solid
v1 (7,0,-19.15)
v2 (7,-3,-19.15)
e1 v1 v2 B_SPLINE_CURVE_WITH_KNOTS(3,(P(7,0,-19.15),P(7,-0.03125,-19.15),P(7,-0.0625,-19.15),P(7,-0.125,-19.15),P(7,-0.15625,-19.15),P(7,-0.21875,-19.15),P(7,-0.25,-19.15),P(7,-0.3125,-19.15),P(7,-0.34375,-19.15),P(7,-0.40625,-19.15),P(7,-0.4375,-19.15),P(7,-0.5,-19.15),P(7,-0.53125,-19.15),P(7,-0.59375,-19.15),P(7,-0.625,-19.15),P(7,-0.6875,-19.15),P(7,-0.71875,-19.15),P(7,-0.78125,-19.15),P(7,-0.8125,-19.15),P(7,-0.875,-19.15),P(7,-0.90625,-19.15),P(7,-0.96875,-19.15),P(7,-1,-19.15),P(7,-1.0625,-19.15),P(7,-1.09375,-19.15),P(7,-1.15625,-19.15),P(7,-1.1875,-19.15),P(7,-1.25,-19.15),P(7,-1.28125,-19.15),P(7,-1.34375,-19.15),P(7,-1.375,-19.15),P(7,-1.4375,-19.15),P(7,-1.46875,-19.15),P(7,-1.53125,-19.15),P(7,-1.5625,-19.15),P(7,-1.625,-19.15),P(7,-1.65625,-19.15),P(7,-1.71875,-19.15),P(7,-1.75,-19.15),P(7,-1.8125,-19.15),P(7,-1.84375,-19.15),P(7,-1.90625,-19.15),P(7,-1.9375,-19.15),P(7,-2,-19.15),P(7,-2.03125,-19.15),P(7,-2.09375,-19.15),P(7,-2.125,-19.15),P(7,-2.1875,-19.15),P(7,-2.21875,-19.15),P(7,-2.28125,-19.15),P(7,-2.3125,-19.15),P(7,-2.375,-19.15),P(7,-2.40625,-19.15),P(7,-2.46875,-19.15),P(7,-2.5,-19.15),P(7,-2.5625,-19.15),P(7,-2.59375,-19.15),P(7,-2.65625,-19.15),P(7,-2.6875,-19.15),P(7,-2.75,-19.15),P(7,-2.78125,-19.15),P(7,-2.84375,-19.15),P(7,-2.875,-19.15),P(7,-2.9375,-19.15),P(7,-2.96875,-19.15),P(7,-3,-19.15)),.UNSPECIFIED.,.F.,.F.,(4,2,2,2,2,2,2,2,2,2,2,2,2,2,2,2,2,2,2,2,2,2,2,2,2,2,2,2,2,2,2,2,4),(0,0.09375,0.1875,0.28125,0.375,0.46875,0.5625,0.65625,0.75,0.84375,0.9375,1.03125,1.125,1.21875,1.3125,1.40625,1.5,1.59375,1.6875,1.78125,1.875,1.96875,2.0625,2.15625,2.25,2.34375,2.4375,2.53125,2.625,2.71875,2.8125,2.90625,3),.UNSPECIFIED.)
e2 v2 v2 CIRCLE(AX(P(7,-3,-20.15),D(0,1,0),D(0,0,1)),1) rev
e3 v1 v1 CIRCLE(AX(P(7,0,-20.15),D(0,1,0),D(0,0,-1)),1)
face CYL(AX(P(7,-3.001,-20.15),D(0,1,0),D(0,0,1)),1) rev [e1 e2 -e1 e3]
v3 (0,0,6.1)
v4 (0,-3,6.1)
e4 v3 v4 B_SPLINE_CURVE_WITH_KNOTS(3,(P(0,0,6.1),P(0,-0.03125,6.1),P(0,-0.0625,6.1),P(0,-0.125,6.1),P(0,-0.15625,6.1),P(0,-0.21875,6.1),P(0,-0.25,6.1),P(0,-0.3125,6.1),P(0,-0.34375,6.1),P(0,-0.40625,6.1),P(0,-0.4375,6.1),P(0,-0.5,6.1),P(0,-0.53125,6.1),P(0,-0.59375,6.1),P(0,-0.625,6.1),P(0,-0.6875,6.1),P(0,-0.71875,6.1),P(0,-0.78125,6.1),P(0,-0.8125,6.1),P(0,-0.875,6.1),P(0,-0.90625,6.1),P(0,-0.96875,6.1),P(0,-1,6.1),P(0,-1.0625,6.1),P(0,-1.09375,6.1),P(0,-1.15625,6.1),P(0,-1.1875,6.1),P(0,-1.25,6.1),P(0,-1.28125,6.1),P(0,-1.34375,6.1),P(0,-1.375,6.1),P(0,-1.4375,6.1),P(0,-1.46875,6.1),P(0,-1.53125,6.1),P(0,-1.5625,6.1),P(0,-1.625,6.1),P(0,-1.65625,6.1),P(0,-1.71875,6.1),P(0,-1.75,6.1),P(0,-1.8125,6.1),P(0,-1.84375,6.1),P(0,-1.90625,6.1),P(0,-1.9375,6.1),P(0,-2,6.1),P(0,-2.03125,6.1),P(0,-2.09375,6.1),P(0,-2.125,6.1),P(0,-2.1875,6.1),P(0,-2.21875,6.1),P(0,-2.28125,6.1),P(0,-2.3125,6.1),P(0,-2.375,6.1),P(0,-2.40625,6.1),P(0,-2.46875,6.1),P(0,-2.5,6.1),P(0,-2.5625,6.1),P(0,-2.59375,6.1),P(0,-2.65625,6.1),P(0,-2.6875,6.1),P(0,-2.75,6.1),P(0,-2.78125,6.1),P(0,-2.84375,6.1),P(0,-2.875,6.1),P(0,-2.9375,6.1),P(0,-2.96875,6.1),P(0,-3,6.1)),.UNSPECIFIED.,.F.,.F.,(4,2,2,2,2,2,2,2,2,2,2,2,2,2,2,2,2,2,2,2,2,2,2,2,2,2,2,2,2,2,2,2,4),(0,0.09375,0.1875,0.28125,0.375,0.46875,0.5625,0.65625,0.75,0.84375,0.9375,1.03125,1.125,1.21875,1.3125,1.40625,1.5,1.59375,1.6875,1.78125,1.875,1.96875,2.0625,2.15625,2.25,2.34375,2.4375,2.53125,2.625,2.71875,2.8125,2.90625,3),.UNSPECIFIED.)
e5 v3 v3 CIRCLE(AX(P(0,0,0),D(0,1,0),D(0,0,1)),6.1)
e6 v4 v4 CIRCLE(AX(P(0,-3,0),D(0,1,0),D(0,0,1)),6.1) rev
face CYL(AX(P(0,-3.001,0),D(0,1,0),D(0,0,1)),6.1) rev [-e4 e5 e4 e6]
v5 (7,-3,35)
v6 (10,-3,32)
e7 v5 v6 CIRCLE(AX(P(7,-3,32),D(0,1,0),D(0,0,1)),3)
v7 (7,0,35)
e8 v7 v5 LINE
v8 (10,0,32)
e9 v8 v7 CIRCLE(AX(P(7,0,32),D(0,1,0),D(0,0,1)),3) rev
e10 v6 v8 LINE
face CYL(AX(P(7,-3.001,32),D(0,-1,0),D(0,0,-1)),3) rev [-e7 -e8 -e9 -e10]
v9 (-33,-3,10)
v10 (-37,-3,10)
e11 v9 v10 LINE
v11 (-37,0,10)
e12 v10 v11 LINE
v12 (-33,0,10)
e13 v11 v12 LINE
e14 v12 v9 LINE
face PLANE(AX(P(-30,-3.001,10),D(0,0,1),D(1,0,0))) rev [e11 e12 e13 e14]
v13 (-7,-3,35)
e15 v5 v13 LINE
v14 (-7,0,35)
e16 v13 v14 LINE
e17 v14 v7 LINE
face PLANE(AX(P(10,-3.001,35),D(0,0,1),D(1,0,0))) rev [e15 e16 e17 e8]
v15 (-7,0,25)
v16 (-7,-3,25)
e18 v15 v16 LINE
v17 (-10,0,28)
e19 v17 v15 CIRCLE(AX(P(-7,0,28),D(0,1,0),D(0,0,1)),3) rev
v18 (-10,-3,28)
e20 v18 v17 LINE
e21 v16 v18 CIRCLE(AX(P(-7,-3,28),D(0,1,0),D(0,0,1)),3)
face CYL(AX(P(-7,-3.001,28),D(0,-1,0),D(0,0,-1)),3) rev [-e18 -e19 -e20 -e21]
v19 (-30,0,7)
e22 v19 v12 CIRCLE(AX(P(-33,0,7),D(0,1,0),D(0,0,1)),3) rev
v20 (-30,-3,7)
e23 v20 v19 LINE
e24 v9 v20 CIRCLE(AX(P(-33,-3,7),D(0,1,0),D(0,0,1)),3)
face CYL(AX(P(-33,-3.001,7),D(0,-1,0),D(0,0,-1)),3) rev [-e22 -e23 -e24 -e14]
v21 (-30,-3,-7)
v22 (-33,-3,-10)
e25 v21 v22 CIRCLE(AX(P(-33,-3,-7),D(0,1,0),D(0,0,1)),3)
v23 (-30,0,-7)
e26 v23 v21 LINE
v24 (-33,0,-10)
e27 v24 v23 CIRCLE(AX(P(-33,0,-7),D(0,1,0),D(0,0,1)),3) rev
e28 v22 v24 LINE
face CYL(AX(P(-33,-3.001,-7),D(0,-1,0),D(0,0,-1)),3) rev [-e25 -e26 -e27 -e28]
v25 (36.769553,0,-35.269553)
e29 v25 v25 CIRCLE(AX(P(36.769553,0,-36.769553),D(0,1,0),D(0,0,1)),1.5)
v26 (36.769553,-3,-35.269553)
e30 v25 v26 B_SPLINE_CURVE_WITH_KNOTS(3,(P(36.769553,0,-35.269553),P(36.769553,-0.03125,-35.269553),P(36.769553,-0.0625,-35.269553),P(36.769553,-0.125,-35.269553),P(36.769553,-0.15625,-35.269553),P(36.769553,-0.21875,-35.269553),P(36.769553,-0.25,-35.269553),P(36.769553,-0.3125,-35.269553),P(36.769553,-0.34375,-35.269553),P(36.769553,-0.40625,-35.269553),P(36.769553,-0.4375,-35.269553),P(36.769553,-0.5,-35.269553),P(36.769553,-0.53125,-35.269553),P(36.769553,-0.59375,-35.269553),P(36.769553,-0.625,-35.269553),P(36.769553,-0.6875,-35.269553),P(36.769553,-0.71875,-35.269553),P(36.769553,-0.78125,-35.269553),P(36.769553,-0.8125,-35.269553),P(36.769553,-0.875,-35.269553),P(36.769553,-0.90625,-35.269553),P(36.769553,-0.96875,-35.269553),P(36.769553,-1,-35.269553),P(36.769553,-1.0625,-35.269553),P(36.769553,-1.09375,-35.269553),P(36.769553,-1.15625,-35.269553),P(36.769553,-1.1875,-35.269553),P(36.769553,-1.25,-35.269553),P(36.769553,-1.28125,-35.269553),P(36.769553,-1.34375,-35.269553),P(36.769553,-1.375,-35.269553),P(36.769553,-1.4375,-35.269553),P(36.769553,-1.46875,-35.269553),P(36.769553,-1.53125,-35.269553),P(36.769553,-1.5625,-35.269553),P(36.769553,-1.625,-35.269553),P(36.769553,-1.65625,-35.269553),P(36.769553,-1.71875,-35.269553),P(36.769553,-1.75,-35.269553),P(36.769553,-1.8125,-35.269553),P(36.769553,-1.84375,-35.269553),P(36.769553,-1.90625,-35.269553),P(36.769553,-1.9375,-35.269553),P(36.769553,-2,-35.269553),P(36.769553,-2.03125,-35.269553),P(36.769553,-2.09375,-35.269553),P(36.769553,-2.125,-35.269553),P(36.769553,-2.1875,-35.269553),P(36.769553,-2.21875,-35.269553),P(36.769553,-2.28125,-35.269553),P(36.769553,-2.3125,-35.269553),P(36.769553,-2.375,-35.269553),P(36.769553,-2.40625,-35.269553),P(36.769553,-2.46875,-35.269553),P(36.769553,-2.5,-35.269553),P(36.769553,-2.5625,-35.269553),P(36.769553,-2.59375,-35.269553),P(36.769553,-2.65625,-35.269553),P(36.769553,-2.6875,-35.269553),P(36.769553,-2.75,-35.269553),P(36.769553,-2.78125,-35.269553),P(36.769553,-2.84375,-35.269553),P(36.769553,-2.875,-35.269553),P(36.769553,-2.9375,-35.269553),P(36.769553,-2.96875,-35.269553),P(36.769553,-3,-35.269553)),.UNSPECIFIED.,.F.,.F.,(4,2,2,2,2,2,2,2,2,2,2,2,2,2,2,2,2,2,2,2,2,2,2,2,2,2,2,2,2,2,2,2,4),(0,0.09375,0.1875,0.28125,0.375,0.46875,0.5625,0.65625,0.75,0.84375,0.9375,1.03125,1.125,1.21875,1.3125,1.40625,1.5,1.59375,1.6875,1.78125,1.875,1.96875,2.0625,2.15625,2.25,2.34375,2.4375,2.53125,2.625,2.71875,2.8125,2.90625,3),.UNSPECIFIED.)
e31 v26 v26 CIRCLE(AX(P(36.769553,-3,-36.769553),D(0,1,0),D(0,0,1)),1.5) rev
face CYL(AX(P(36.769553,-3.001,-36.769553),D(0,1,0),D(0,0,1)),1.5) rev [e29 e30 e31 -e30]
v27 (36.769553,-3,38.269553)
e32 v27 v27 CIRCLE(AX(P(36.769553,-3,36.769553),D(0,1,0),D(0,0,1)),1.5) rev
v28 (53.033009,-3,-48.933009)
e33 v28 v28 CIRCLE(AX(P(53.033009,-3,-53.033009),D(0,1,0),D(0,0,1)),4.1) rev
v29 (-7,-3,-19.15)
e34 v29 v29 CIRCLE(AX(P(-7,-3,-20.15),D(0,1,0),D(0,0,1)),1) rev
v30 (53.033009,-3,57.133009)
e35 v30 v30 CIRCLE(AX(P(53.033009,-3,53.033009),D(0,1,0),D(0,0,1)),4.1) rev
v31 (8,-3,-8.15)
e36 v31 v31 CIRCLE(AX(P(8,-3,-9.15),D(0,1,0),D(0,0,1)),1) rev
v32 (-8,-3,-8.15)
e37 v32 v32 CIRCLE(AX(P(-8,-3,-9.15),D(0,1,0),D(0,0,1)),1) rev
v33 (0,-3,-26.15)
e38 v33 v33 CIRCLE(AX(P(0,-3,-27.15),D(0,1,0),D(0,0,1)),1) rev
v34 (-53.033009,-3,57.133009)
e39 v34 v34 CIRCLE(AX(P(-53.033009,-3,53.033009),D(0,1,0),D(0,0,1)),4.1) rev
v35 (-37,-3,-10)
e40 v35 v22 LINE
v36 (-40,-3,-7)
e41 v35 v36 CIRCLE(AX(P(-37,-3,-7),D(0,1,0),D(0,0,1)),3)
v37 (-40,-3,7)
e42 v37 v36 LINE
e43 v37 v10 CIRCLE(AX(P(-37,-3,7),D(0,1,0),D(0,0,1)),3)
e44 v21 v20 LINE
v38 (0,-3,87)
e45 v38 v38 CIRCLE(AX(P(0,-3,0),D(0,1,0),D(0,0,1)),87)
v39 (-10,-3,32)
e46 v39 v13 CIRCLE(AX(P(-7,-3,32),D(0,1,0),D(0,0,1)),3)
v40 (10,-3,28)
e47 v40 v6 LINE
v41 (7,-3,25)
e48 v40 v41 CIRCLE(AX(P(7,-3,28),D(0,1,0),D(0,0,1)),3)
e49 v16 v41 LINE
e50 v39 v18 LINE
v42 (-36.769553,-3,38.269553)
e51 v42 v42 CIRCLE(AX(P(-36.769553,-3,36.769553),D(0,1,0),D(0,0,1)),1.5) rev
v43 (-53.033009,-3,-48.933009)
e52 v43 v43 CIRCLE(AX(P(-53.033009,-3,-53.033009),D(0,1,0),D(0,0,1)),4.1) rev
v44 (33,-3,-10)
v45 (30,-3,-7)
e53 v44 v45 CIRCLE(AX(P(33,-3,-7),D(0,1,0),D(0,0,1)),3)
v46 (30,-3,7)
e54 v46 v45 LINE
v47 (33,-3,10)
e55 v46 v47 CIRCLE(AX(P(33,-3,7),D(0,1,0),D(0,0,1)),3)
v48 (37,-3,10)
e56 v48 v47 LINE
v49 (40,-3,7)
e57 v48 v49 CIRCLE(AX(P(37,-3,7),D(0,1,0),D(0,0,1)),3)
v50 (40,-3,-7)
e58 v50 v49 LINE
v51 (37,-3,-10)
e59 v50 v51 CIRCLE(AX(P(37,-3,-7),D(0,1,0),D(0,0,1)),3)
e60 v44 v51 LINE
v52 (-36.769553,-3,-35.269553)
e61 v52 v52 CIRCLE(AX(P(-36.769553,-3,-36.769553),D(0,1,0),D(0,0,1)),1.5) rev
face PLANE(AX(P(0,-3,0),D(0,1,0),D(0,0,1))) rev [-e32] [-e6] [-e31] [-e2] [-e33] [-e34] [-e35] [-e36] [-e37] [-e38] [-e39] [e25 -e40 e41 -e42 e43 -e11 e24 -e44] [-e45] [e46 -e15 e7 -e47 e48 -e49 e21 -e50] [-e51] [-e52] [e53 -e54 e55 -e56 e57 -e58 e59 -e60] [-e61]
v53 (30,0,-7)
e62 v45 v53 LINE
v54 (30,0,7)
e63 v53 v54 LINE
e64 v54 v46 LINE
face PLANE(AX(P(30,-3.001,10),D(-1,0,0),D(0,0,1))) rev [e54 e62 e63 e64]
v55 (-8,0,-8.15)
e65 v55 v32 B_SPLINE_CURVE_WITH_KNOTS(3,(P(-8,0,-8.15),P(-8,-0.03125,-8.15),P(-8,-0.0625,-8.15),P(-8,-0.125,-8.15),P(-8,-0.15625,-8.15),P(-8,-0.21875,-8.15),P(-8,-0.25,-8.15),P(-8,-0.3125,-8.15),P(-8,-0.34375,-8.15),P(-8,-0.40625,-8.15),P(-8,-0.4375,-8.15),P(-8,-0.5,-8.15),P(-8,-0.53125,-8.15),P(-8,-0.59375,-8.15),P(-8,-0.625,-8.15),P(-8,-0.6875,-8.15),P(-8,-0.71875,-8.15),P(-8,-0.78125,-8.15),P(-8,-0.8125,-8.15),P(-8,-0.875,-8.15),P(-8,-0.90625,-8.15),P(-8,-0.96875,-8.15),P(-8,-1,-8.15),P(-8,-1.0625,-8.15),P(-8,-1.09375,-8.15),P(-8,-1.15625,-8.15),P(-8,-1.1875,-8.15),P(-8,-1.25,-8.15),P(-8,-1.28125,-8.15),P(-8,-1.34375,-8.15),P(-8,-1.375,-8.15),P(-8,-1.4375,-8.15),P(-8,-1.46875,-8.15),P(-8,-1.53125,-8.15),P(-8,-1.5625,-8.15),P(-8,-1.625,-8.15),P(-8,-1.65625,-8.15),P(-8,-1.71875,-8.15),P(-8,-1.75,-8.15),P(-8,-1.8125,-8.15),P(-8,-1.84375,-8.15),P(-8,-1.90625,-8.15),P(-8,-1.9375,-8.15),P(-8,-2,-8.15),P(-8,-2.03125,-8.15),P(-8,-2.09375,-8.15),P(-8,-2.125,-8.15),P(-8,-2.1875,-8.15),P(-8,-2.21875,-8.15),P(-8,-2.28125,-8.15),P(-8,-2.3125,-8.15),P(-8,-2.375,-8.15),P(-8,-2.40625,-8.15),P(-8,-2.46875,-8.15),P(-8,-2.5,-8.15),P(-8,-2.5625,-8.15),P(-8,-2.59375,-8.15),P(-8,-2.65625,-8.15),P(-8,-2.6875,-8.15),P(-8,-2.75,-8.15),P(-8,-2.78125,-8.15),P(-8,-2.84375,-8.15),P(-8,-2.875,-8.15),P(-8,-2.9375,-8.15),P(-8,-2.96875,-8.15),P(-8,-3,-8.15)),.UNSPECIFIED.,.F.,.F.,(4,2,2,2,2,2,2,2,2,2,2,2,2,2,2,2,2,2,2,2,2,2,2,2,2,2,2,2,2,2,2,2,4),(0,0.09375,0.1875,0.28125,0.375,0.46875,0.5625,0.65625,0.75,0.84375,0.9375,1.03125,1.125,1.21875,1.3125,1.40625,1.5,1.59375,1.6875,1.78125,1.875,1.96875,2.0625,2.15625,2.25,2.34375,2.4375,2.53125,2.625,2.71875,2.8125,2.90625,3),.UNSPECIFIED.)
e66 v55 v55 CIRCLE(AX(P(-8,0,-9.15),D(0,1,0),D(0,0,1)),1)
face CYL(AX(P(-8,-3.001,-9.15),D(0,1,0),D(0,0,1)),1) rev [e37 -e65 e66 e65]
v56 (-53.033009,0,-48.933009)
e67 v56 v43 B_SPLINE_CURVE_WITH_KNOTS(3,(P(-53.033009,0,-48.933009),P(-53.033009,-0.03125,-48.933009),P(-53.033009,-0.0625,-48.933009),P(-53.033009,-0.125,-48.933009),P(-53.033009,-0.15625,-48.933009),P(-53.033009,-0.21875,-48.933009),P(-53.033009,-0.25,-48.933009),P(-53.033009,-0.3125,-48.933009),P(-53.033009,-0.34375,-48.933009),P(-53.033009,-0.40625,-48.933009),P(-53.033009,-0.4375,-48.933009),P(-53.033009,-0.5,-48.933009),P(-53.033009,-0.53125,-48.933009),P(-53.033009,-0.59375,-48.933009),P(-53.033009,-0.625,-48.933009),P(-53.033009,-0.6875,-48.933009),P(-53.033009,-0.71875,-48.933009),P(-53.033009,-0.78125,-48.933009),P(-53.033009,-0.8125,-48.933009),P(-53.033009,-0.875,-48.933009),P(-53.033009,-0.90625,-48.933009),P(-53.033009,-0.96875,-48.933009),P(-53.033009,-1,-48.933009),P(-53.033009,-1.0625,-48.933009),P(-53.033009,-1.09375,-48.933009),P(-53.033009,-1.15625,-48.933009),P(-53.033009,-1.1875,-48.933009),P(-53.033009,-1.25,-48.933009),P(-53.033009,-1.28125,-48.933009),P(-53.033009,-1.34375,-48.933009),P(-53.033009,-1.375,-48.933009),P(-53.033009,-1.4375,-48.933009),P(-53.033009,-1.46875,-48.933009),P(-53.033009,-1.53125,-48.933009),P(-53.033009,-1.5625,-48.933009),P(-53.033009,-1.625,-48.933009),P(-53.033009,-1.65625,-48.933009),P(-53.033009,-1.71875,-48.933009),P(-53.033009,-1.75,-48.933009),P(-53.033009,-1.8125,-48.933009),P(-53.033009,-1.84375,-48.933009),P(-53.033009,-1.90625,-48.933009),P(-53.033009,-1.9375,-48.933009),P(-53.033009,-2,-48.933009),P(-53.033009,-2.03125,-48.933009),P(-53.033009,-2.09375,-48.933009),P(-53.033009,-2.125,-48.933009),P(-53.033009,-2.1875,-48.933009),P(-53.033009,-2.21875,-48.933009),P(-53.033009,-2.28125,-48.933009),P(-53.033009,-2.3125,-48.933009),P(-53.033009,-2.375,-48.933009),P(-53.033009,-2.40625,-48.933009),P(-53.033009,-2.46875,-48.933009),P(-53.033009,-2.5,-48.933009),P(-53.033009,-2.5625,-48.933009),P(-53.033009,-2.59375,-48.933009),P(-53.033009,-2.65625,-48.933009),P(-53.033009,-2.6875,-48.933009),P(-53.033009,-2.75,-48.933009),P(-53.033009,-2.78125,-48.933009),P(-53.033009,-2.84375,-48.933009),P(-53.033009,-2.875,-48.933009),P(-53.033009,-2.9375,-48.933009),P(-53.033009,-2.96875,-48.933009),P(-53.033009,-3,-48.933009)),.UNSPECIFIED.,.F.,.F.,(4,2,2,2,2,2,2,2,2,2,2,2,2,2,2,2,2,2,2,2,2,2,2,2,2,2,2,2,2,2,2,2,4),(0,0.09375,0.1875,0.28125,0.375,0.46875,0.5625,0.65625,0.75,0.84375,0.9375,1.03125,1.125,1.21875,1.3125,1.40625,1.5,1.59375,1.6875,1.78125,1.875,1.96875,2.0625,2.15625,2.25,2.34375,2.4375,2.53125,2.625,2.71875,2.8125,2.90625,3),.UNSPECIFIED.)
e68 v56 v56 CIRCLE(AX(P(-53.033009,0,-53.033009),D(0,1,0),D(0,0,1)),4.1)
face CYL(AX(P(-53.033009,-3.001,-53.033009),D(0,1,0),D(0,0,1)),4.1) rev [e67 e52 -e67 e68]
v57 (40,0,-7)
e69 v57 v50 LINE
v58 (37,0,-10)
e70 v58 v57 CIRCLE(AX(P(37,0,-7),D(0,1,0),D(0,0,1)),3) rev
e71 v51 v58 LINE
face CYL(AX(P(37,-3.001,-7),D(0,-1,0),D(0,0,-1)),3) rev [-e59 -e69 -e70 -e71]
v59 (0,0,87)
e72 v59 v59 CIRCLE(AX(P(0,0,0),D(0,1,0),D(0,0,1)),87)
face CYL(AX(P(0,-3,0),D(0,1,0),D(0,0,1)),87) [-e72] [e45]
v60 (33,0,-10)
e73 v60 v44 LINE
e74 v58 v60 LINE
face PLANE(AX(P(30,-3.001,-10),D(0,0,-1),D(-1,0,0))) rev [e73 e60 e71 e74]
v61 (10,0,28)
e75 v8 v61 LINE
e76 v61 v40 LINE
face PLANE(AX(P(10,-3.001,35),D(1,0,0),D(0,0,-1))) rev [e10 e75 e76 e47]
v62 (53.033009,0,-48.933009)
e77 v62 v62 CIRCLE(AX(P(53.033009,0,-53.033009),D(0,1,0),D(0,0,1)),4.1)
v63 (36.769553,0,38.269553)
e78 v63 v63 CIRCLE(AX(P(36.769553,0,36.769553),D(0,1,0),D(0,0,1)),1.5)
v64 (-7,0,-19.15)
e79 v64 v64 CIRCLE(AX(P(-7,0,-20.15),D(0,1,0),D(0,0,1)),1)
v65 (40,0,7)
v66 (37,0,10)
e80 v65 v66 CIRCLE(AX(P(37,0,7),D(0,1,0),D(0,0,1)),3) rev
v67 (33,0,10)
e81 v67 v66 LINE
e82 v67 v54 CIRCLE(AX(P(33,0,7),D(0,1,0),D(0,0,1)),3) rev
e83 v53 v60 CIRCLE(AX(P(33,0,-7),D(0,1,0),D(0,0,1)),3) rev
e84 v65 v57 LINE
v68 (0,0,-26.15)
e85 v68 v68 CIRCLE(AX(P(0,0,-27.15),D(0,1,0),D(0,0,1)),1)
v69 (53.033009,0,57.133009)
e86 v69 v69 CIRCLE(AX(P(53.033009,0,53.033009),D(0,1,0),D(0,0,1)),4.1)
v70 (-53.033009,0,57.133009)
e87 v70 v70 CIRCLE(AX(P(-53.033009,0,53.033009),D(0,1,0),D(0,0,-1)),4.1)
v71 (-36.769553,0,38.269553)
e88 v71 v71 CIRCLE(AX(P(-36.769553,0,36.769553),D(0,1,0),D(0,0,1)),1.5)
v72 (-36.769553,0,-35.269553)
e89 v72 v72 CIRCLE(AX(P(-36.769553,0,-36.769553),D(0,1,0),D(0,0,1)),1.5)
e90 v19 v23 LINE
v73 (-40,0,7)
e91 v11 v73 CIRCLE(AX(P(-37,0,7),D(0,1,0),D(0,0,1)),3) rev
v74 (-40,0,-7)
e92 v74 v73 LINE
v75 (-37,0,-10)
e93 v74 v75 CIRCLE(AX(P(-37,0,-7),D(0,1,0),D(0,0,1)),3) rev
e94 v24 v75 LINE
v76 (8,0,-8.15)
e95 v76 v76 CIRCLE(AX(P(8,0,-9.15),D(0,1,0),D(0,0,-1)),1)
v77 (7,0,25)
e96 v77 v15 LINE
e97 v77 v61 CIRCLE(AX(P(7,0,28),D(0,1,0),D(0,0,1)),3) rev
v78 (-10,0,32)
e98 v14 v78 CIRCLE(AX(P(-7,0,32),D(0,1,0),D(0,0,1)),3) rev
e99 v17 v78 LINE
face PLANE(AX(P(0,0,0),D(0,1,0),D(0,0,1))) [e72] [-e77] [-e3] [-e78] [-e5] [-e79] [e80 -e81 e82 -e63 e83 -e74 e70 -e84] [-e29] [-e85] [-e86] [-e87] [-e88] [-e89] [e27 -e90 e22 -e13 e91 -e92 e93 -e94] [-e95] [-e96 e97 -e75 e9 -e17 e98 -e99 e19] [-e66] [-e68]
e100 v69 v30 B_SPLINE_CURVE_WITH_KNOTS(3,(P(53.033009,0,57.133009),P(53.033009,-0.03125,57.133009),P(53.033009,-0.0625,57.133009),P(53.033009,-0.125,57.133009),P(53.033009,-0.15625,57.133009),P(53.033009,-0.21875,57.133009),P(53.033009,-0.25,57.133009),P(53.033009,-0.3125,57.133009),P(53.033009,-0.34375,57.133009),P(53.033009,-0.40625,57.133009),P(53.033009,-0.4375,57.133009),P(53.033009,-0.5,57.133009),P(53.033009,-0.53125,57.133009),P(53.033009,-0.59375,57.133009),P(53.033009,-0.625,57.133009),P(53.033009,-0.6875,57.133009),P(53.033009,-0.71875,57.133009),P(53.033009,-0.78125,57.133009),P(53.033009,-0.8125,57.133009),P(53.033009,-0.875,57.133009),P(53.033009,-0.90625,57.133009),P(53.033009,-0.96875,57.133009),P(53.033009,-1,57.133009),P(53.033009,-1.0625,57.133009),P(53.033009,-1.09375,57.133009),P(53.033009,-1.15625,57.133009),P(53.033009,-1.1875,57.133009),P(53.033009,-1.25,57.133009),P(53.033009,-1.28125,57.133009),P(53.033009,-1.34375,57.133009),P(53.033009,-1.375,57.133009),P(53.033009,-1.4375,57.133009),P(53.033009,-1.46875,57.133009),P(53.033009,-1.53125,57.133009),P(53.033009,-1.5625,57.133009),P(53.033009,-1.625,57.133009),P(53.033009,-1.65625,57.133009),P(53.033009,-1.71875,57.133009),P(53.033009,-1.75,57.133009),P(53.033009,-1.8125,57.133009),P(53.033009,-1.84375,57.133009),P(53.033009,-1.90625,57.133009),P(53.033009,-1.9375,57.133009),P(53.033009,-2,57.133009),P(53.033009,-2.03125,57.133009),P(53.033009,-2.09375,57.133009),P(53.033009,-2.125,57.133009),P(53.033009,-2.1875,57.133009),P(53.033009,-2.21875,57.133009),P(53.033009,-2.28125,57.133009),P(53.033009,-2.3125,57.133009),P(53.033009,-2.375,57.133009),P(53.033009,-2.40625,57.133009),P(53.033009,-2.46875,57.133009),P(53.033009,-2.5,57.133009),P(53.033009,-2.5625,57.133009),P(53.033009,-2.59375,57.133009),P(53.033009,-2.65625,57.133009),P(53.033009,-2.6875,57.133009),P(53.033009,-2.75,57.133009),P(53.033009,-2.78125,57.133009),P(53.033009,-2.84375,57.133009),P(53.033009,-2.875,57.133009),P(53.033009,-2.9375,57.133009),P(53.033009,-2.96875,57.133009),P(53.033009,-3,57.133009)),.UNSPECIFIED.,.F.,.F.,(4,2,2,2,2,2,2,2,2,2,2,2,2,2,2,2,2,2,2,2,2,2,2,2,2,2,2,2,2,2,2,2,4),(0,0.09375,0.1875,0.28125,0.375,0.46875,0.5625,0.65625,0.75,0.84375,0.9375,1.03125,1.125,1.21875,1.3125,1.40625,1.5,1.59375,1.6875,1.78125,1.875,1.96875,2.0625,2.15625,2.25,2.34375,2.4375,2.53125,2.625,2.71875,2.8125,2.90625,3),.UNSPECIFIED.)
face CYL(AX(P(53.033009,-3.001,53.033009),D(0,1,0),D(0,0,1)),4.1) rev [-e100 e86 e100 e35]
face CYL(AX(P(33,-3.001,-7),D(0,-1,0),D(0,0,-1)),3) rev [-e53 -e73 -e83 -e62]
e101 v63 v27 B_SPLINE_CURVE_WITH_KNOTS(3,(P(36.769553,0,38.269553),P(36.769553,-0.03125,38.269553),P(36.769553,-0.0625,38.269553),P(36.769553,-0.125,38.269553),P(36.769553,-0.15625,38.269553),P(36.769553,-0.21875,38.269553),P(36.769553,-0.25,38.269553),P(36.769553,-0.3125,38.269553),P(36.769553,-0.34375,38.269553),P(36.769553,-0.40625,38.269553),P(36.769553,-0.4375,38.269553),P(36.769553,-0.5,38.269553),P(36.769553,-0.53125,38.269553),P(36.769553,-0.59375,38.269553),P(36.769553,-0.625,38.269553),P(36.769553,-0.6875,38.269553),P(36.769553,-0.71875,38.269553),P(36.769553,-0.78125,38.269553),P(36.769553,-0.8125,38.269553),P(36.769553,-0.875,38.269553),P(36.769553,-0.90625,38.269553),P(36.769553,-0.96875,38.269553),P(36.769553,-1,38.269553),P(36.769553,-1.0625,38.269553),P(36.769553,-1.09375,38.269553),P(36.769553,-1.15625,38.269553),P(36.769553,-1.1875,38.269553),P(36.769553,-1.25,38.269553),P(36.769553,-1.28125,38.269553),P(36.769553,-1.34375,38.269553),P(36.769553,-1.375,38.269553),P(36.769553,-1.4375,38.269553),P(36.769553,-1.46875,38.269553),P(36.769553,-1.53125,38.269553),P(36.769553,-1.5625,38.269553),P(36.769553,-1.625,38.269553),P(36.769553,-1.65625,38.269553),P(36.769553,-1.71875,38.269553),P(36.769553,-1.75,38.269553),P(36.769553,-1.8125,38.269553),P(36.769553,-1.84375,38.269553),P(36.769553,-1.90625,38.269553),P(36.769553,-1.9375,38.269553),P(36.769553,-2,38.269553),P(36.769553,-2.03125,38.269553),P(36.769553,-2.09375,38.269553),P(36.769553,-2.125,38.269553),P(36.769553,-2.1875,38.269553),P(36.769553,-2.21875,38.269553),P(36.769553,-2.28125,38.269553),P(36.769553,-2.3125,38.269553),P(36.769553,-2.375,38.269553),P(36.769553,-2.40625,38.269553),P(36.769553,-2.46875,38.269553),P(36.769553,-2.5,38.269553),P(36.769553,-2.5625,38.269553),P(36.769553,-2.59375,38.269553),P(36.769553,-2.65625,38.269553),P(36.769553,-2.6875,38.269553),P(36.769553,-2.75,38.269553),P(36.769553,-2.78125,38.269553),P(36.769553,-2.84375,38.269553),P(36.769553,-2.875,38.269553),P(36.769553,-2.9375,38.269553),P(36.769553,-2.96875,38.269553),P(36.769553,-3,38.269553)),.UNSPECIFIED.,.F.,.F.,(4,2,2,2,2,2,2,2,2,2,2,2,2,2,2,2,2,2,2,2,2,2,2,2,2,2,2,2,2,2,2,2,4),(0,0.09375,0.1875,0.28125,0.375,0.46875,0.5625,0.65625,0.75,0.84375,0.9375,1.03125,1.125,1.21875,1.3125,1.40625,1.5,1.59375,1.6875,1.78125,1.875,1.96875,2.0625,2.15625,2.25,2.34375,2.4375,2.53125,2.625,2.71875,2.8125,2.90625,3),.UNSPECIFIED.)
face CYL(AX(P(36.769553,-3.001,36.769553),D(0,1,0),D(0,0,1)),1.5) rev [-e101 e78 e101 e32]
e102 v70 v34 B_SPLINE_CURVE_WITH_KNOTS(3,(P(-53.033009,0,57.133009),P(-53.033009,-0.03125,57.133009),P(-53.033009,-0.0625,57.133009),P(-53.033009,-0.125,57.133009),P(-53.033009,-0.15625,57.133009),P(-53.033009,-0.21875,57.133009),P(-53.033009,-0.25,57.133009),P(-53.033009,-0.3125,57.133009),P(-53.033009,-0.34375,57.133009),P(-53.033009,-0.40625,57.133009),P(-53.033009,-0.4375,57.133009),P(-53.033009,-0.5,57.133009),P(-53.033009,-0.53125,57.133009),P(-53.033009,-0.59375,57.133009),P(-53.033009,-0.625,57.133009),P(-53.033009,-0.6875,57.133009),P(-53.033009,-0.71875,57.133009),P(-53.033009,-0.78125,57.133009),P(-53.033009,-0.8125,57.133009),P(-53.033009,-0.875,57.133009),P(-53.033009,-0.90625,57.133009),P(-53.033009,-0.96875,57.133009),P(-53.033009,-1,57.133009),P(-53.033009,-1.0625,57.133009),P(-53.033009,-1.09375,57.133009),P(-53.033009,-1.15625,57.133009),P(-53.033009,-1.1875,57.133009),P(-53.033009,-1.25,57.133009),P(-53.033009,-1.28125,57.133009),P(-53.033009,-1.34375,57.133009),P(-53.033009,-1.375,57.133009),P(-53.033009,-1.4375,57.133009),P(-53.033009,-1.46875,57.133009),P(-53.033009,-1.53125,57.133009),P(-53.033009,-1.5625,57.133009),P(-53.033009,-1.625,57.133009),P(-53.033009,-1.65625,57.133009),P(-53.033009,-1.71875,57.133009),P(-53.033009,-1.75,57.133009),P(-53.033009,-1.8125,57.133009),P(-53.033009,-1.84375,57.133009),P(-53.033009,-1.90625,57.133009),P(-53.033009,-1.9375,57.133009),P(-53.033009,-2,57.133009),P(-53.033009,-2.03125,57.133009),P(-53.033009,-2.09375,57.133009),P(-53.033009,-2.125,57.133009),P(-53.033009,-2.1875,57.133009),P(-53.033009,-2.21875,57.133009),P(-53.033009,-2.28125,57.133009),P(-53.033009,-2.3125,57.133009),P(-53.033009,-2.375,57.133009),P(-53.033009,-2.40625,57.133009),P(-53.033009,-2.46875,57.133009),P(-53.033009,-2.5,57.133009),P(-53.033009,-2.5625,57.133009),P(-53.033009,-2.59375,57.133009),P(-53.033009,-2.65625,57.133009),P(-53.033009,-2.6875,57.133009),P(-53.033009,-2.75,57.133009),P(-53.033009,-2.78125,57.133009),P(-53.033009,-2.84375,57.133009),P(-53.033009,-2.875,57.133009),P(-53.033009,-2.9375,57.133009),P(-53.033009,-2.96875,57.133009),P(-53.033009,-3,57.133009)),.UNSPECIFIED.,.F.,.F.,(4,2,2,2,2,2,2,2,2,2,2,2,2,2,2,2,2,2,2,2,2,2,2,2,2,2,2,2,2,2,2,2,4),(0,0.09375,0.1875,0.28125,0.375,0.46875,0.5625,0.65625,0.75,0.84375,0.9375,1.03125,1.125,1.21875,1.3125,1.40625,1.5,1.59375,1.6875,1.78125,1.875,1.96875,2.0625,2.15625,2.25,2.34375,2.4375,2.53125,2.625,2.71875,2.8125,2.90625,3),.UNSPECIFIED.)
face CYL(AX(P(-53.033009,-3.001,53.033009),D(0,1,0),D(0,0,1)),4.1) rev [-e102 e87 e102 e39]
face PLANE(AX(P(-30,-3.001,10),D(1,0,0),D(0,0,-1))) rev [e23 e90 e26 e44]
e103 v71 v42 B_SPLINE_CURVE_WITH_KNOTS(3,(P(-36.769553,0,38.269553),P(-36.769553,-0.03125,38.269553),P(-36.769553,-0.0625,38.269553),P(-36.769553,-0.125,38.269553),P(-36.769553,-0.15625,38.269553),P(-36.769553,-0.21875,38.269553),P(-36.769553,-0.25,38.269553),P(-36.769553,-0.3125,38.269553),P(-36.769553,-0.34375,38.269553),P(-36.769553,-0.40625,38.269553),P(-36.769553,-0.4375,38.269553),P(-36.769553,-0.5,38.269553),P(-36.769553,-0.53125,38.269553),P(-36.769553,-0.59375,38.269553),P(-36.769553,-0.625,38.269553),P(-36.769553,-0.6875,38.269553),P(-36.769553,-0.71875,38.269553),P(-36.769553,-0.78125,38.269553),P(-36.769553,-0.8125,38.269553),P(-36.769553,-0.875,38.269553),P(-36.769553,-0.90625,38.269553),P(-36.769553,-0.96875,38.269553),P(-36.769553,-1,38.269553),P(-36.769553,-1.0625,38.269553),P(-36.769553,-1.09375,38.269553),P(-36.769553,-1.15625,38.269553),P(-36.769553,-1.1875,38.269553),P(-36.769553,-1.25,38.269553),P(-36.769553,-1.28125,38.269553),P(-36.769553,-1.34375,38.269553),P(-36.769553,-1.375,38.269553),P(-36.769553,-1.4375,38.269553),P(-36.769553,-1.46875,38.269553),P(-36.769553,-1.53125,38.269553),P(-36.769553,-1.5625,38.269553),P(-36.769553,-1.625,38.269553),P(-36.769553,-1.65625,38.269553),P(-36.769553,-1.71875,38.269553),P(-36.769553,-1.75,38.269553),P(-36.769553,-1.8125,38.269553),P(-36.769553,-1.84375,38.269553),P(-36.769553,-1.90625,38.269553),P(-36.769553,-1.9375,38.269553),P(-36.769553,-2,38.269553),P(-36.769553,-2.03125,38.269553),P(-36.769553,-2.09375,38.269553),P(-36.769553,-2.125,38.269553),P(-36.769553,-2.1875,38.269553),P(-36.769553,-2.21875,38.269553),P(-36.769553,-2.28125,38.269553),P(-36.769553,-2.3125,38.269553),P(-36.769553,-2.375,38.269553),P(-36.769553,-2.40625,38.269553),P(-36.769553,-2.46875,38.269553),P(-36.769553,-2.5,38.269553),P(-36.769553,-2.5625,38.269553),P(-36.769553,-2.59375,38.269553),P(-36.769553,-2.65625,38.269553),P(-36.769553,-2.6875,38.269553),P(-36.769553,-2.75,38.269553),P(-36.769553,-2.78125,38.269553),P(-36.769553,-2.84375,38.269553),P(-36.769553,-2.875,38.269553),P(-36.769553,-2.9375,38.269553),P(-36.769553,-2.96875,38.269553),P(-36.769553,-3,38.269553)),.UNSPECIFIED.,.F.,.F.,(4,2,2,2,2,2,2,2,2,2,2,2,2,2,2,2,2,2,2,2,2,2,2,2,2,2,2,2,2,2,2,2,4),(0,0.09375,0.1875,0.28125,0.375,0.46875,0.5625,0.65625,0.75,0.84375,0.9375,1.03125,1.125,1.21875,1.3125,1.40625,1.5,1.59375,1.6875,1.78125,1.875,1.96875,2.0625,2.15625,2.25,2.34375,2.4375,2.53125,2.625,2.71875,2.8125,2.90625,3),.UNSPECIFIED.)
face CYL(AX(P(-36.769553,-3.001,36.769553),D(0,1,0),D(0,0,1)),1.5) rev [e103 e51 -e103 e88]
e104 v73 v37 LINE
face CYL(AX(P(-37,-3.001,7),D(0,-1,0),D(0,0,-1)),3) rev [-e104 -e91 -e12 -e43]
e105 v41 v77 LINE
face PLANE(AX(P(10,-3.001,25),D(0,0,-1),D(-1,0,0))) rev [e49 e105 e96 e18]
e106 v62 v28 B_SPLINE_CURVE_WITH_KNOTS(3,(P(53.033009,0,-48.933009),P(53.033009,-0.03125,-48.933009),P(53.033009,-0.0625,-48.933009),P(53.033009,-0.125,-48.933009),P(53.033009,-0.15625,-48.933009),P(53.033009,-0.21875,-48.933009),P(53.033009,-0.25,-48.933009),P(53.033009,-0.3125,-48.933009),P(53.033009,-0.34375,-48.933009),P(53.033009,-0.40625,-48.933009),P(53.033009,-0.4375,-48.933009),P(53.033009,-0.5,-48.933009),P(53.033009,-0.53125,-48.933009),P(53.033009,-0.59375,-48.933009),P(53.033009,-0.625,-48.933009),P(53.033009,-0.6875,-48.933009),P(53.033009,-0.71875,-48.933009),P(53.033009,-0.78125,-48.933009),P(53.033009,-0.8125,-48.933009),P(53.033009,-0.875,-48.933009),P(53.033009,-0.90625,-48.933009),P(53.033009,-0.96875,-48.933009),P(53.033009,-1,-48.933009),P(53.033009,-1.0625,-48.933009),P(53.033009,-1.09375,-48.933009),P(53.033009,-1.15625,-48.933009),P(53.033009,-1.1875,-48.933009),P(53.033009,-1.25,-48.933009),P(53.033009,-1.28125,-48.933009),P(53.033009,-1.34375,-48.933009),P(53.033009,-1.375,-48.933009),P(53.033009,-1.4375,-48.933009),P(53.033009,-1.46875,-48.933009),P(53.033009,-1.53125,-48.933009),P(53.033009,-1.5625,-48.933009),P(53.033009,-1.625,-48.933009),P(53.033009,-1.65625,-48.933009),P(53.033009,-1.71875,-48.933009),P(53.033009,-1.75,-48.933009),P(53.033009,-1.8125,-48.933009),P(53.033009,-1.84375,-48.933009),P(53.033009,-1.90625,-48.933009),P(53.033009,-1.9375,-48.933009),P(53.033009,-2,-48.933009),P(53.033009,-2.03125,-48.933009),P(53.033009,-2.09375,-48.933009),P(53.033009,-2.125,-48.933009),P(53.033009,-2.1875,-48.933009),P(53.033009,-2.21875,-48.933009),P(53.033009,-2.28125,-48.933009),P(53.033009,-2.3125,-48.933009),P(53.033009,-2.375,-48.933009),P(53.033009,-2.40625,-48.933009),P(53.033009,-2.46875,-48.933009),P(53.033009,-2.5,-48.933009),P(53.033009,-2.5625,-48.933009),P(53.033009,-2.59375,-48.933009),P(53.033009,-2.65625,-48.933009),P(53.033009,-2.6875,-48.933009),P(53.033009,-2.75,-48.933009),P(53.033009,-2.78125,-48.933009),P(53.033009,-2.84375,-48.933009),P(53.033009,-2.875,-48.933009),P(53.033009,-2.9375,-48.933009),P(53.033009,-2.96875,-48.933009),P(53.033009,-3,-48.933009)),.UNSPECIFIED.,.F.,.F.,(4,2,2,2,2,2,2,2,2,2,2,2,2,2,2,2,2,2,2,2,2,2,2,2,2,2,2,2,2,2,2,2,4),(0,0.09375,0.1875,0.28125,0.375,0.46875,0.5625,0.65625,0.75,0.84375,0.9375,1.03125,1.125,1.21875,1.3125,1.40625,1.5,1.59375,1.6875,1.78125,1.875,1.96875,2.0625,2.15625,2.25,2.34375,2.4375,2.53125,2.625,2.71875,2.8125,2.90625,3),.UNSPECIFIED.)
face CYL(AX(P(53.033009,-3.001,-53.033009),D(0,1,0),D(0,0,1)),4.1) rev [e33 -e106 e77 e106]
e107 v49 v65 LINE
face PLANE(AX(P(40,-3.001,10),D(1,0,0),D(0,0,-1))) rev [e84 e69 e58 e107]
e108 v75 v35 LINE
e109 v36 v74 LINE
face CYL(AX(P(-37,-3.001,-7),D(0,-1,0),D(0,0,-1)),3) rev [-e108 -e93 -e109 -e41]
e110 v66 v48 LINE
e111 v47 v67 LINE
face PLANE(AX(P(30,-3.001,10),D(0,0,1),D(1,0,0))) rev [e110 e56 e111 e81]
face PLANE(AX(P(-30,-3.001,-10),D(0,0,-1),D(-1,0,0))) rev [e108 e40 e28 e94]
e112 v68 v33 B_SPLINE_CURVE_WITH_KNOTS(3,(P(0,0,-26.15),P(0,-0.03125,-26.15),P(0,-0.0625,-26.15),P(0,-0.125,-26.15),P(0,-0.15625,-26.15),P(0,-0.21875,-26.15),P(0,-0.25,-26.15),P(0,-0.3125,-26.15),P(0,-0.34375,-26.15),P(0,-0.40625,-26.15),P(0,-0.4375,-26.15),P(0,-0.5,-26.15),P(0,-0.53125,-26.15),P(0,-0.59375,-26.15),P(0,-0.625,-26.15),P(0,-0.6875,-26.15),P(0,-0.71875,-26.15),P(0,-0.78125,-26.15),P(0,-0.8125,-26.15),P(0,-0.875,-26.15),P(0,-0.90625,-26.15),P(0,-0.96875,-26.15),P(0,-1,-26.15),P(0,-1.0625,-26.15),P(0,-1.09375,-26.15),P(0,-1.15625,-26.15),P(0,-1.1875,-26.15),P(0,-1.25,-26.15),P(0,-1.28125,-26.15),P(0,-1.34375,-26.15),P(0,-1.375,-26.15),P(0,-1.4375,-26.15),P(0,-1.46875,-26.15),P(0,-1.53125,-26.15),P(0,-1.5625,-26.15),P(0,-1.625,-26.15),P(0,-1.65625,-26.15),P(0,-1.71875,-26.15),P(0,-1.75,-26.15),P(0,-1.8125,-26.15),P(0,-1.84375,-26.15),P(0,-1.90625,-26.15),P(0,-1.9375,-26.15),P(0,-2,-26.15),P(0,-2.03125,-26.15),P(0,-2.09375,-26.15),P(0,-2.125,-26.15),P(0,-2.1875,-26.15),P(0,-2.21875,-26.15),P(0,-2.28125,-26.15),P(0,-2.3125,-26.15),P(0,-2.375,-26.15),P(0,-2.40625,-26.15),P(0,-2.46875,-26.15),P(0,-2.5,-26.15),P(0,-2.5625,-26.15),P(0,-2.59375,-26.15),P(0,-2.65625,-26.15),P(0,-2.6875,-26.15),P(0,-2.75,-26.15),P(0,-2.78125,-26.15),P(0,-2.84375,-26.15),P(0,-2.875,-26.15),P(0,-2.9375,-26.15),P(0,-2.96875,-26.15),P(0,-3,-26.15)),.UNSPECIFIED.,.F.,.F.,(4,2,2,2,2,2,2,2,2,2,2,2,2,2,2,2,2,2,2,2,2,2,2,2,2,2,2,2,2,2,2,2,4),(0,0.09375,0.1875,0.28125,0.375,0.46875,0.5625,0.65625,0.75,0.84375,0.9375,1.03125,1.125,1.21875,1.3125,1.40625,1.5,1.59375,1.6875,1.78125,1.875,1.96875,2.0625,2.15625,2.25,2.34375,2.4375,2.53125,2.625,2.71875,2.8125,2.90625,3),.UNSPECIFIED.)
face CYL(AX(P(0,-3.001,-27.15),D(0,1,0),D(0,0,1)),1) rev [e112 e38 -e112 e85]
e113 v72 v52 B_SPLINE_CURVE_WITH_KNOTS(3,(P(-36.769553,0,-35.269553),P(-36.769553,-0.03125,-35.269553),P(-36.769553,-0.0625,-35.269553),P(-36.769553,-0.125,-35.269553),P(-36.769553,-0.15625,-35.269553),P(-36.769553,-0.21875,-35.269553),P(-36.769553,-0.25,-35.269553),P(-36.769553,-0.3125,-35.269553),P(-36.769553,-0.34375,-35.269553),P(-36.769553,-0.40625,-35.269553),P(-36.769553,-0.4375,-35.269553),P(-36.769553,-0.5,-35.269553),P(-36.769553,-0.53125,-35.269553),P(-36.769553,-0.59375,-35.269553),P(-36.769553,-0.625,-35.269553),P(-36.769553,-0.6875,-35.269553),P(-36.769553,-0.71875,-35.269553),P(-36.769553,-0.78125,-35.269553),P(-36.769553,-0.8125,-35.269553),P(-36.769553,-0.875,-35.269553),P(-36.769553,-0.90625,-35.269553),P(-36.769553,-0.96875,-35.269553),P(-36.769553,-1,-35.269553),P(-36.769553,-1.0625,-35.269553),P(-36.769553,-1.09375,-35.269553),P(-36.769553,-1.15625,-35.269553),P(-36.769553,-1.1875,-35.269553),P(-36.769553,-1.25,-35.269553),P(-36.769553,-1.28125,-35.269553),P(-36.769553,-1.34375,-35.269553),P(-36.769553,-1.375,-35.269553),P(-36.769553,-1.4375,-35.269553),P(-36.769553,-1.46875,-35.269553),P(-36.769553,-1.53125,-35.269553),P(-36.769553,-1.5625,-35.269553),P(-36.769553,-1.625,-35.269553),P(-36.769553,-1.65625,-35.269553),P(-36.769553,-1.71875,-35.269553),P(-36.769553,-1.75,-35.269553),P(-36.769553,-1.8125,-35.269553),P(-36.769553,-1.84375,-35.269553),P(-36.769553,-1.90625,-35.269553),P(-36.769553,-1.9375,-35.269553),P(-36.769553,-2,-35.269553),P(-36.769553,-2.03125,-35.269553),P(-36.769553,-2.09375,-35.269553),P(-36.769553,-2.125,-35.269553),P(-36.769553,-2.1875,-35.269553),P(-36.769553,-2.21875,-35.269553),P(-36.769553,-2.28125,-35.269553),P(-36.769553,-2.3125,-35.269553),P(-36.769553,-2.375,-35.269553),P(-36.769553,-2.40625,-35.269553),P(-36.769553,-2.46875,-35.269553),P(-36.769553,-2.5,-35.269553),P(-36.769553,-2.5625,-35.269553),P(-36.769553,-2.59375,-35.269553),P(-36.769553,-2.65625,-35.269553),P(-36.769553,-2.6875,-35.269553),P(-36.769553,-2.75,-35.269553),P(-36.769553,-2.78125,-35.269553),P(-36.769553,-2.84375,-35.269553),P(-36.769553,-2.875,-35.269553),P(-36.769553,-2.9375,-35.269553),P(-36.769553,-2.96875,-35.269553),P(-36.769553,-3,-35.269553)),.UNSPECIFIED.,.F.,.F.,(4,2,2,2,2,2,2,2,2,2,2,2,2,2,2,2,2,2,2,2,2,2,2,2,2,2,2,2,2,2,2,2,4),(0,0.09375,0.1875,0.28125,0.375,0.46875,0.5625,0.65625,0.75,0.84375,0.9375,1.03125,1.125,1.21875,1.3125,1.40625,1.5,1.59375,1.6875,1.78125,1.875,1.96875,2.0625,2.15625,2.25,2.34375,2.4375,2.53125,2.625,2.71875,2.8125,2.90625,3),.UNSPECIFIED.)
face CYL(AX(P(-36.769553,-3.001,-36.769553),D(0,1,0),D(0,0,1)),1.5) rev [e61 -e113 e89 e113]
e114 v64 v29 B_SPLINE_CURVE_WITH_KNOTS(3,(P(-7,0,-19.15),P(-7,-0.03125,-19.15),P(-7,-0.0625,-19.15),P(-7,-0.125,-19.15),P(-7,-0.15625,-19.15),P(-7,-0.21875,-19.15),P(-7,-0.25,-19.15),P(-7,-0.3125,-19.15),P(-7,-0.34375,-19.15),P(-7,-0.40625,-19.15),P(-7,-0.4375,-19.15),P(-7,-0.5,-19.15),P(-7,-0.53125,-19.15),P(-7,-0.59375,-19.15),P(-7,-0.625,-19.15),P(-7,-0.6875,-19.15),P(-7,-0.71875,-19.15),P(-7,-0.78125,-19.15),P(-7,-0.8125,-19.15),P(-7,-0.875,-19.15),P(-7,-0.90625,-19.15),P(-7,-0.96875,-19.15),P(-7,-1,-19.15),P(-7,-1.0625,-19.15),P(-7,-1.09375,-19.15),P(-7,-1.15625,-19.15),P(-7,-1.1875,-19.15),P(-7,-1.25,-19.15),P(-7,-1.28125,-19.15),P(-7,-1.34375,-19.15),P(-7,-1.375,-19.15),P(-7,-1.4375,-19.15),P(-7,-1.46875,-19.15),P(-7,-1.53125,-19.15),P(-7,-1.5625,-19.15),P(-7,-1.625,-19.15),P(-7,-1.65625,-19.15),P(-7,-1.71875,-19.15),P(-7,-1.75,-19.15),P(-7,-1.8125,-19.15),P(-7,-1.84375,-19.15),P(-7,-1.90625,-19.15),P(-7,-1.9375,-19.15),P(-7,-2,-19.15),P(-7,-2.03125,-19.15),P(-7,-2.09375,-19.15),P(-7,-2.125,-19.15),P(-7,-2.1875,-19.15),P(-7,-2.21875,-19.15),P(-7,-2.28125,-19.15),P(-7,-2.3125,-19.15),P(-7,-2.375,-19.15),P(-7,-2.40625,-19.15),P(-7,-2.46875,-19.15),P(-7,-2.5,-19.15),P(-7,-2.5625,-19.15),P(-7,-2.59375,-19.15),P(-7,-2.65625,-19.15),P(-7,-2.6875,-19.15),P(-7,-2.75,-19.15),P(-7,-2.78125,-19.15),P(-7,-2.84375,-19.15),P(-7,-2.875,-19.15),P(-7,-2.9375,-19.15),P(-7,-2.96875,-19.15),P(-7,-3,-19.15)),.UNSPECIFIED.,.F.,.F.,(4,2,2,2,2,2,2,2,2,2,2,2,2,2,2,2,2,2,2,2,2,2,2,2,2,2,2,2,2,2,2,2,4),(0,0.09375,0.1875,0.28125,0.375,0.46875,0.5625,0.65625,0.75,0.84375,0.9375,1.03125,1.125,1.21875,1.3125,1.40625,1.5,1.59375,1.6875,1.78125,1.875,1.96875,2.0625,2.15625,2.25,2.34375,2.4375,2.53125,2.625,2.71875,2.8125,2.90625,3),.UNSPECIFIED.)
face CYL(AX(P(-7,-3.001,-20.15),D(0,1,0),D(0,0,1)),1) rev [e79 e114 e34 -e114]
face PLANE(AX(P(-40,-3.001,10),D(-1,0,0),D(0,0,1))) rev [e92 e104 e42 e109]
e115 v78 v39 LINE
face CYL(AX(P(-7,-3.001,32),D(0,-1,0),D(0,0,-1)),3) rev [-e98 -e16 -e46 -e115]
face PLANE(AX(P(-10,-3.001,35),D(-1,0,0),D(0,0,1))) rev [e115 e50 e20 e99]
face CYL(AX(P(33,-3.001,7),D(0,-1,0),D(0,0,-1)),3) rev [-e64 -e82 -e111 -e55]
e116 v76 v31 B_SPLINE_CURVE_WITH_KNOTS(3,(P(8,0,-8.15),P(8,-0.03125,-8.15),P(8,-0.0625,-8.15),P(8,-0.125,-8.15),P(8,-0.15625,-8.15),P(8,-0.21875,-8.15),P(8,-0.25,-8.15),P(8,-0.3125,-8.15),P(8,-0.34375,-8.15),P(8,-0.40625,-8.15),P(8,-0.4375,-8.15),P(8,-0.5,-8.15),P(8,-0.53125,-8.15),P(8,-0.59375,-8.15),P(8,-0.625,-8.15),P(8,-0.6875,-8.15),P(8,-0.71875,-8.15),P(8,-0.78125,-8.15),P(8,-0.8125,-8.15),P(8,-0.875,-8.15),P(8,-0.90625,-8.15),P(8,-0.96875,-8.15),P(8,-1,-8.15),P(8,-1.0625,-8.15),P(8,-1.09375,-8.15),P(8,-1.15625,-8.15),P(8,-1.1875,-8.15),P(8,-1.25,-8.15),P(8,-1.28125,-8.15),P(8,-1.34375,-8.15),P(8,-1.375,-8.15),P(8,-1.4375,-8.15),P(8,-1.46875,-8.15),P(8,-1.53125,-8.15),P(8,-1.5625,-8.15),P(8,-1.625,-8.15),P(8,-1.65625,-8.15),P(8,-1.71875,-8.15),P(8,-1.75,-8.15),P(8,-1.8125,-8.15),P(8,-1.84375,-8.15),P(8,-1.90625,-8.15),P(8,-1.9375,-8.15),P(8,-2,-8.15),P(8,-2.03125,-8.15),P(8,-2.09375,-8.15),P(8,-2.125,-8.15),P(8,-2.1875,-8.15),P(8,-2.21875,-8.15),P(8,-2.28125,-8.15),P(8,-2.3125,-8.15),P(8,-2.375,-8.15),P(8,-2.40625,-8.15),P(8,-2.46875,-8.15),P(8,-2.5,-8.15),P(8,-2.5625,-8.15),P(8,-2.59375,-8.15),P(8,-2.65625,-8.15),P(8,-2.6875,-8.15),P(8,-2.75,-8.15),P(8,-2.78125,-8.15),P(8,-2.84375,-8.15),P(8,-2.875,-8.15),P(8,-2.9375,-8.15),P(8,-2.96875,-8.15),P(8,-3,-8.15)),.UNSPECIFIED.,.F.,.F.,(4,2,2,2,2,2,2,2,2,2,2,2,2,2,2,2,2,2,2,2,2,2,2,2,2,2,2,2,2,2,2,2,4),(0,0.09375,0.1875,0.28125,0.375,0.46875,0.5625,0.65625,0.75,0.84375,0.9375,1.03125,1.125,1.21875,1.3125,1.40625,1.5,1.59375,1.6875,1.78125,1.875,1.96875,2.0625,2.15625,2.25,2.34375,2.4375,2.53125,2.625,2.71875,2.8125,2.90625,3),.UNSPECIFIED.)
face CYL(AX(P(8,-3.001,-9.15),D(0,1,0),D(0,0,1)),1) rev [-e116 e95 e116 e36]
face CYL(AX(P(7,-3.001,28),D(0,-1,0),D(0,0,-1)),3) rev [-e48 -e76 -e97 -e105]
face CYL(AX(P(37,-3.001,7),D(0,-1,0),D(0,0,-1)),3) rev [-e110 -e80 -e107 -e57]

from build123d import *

# Parameters (mm, degrees)
SKETCH_1_R             = 87
SM_BASE_FLANGE_1_DEPTH = 3
CUT_EXTRUDE_1_REACH    = 125.073
SKETCH_6_R             = 6.1
SKETCH_6_R_2           = 1
SKETCH_6_R_3           = 4.1
SKETCH_6_R_4           = 1.5
SKETCH_6_W             = 10
SKETCH_6_H             = 20
SKETCH_6_W_2           = 20
SKETCH_6_H_2           = 10
FILLET_1_R             = 3


# Sheet-metal steps are written as plain solids
with BuildPart() as part:
    # Sketch 1 → 基体-法兰1 (new body)
    with BuildSketch(Plane(origin=(0, 0, 0), x_dir=(1, 0, 0), z_dir=(0, 1, 0))):
        with Locations(Location((0, 0, 0), (0, 0, 270))):
            Circle(SKETCH_1_R)
    extrude(amount=-SM_BASE_FLANGE_1_DEPTH)

    # 草图6 → 切除-拉伸1 (cut, up to next)
    with BuildSketch(Plane(origin=(0, 0, 0), x_dir=(1, 0, 0), z_dir=(0, 1, 0)), mode=Mode.PRIVATE) as cut_extrude_1_sk1:
        with Locations(Location((0, 0, 0), (0, 0, 270))):
            Circle(SKETCH_6_R)
    cut_extrude_1_tool1 = extrude(cut_extrude_1_sk1.sketch, amount=-CUT_EXTRUDE_1_REACH, mode=Mode.PRIVATE) & part.part
    # 草图6 → 切除-拉伸1 (cut, up to next)
    with BuildSketch(Plane(origin=(0, 0, 0), x_dir=(1, 0, 0), z_dir=(0, 1, 0)), mode=Mode.PRIVATE) as cut_extrude_1_sk2:
        with Locations(Location((-8, 9.15, 0), (0, 0, 270))):
            Circle(SKETCH_6_R_2)
    cut_extrude_1_tool2 = extrude(cut_extrude_1_sk2.sketch, amount=-CUT_EXTRUDE_1_REACH, mode=Mode.PRIVATE) & part.part
    # 草图6 → 切除-拉伸1 (cut, up to next)
    with BuildSketch(Plane(origin=(0, 0, 0), x_dir=(1, 0, 0), z_dir=(0, 1, 0)), mode=Mode.PRIVATE) as cut_extrude_1_sk3:
        with Locations(Location((-7, 20.15, 0), (0, 0, 270))):
            Circle(SKETCH_6_R_2)
    cut_extrude_1_tool3 = extrude(cut_extrude_1_sk3.sketch, amount=-CUT_EXTRUDE_1_REACH, mode=Mode.PRIVATE) & part.part
    # 草图6 → 切除-拉伸1 (cut, up to next)
    with BuildSketch(Plane(origin=(0, 0, 0), x_dir=(1, 0, 0), z_dir=(0, 1, 0)), mode=Mode.PRIVATE) as cut_extrude_1_sk4:
        with Locations(Location((53.033008589, 53.033008589, 0), (0, 0, 270))):
            Circle(SKETCH_6_R_3)
    cut_extrude_1_tool4 = extrude(cut_extrude_1_sk4.sketch, amount=-CUT_EXTRUDE_1_REACH, mode=Mode.PRIVATE) & part.part
    # 草图6 → 切除-拉伸1 (cut, up to next)
    with BuildSketch(Plane(origin=(0, 0, 0), x_dir=(1, 0, 0), z_dir=(0, 1, 0)), mode=Mode.PRIVATE) as cut_extrude_1_sk5:
        with Locations(Location((-53.033008589, 53.033008589, 0), (0, 0, 270))):
            Circle(SKETCH_6_R_3)
    cut_extrude_1_tool5 = extrude(cut_extrude_1_sk5.sketch, amount=-CUT_EXTRUDE_1_REACH, mode=Mode.PRIVATE) & part.part
    # 草图6 → 切除-拉伸1 (cut, up to next)
    with BuildSketch(Plane(origin=(0, 0, 0), x_dir=(1, 0, 0), z_dir=(0, 1, 0)), mode=Mode.PRIVATE) as cut_extrude_1_sk6:
        with Locations(Location((53.033008589, -53.033008589, 0), (0, 0, 270))):
            Circle(SKETCH_6_R_3)
    cut_extrude_1_tool6 = extrude(cut_extrude_1_sk6.sketch, amount=-CUT_EXTRUDE_1_REACH, mode=Mode.PRIVATE) & part.part
    # 草图6 → 切除-拉伸1 (cut, up to next)
    with BuildSketch(Plane(origin=(0, 0, 0), x_dir=(1, 0, 0), z_dir=(0, 1, 0)), mode=Mode.PRIVATE) as cut_extrude_1_sk7:
        with Locations(Location((-53.033008589, -53.033008589, 0), (0, 0, 270))):
            Circle(SKETCH_6_R_3)
    cut_extrude_1_tool7 = extrude(cut_extrude_1_sk7.sketch, amount=-CUT_EXTRUDE_1_REACH, mode=Mode.PRIVATE) & part.part
    # 草图6 → 切除-拉伸1 (cut, up to next)
    with BuildSketch(Plane(origin=(0, 0, 0), x_dir=(1, 0, 0), z_dir=(0, 1, 0)), mode=Mode.PRIVATE) as cut_extrude_1_sk8:
        with Locations(Location((8, 9.15, 0), (0, 0, 270))):
            Circle(SKETCH_6_R_2)
    cut_extrude_1_tool8 = extrude(cut_extrude_1_sk8.sketch, amount=-CUT_EXTRUDE_1_REACH, mode=Mode.PRIVATE) & part.part
    # 草图6 → 切除-拉伸1 (cut, up to next)
    with BuildSketch(Plane(origin=(0, 0, 0), x_dir=(1, 0, 0), z_dir=(0, 1, 0)), mode=Mode.PRIVATE) as cut_extrude_1_sk9:
        with Locations(Location((7, 20.15, 0), (0, 0, 270))):
            Circle(SKETCH_6_R_2)
    cut_extrude_1_tool9 = extrude(cut_extrude_1_sk9.sketch, amount=-CUT_EXTRUDE_1_REACH, mode=Mode.PRIVATE) & part.part
    # 草图6 → 切除-拉伸1 (cut, up to next)
    with BuildSketch(Plane(origin=(0, 0, 0), x_dir=(1, 0, 0), z_dir=(0, 1, 0)), mode=Mode.PRIVATE) as cut_extrude_1_sk10:
        with Locations(Location((0, 27.15, 0), (0, 0, 270))):
            Circle(SKETCH_6_R_2)
    cut_extrude_1_tool10 = extrude(cut_extrude_1_sk10.sketch, amount=-CUT_EXTRUDE_1_REACH, mode=Mode.PRIVATE) & part.part
    # 草图6 → 切除-拉伸1 (cut, up to next)
    with BuildSketch(Plane(origin=(0, 0, 0), x_dir=(1, 0, 0), z_dir=(0, 1, 0)), mode=Mode.PRIVATE) as cut_extrude_1_sk11:
        with Locations(Location((-36.769552622, -36.769552622, 0), (0, 0, 270))):
            Circle(SKETCH_6_R_4)
    cut_extrude_1_tool11 = extrude(cut_extrude_1_sk11.sketch, amount=-CUT_EXTRUDE_1_REACH, mode=Mode.PRIVATE) & part.part
    # 草图6 → 切除-拉伸1 (cut, up to next)
    with BuildSketch(Plane(origin=(0, 0, 0), x_dir=(1, 0, 0), z_dir=(0, 1, 0)), mode=Mode.PRIVATE) as cut_extrude_1_sk12:
        with Locations(Location((-36.769552622, 36.769552622, 0), (0, 0, 270))):
            Circle(SKETCH_6_R_4)
    cut_extrude_1_tool12 = extrude(cut_extrude_1_sk12.sketch, amount=-CUT_EXTRUDE_1_REACH, mode=Mode.PRIVATE) & part.part
    # 草图6 → 切除-拉伸1 (cut, up to next)
    with BuildSketch(Plane(origin=(0, 0, 0), x_dir=(1, 0, 0), z_dir=(0, 1, 0)), mode=Mode.PRIVATE) as cut_extrude_1_sk13:
        with Locations(Location((36.769552622, 36.769552622, 0), (0, 0, 270))):
            Circle(SKETCH_6_R_4)
    cut_extrude_1_tool13 = extrude(cut_extrude_1_sk13.sketch, amount=-CUT_EXTRUDE_1_REACH, mode=Mode.PRIVATE) & part.part
    # 草图6 → 切除-拉伸1 (cut, up to next)
    with BuildSketch(Plane(origin=(0, 0, 0), x_dir=(1, 0, 0), z_dir=(0, 1, 0)), mode=Mode.PRIVATE) as cut_extrude_1_sk14:
        with Locations(Location((36.769552622, -36.769552622, 0), (0, 0, 270))):
            Circle(SKETCH_6_R_4)
    cut_extrude_1_tool14 = extrude(cut_extrude_1_sk14.sketch, amount=-CUT_EXTRUDE_1_REACH, mode=Mode.PRIVATE) & part.part
    # 草图6 → 切除-拉伸1 (cut, up to next)
    with BuildSketch(Plane(origin=(0, 0, 0), x_dir=(1, 0, 0), z_dir=(0, 1, 0)), mode=Mode.PRIVATE) as cut_extrude_1_sk15:
        with Locations((-35, 0)):
            Rectangle(SKETCH_6_W, SKETCH_6_H)
    cut_extrude_1_tool15 = extrude(cut_extrude_1_sk15.sketch, amount=-CUT_EXTRUDE_1_REACH, mode=Mode.PRIVATE) & part.part
    # 草图6 → 切除-拉伸1 (cut, up to next)
    with BuildSketch(Plane(origin=(0, 0, 0), x_dir=(1, 0, 0), z_dir=(0, 1, 0)), mode=Mode.PRIVATE) as cut_extrude_1_sk16:
        with Locations((35, 0)):
            Rectangle(SKETCH_6_W, SKETCH_6_H)
    cut_extrude_1_tool16 = extrude(cut_extrude_1_sk16.sketch, amount=-CUT_EXTRUDE_1_REACH, mode=Mode.PRIVATE) & part.part
    # 草图6 → 切除-拉伸1 (cut, up to next)
    with BuildSketch(Plane(origin=(0, 0, 0), x_dir=(1, 0, 0), z_dir=(0, 1, 0)), mode=Mode.PRIVATE) as cut_extrude_1_sk17:
        with Locations((0, -30)):
            Rectangle(SKETCH_6_W_2, SKETCH_6_H_2)
    cut_extrude_1_tool17 = extrude(cut_extrude_1_sk17.sketch, amount=-CUT_EXTRUDE_1_REACH, mode=Mode.PRIVATE) & part.part
    add(cut_extrude_1_tool1.solids().sort_by_distance((0, 0, 0))[0], mode=Mode.SUBTRACT)
    add(cut_extrude_1_tool2.solids().sort_by_distance((-8, 0, -9.15))[0], mode=Mode.SUBTRACT)
    add(cut_extrude_1_tool3.solids().sort_by_distance((-7, 0, -20.15))[0], mode=Mode.SUBTRACT)
    add(cut_extrude_1_tool4.solids().sort_by_distance((53.033009, 0, -53.033009))[0], mode=Mode.SUBTRACT)
    add(cut_extrude_1_tool5.solids().sort_by_distance((-53.033009, 0, -53.033009))[0], mode=Mode.SUBTRACT)
    add(cut_extrude_1_tool6.solids().sort_by_distance((53.033009, 0, 53.033009))[0], mode=Mode.SUBTRACT)
    add(cut_extrude_1_tool7.solids().sort_by_distance((-53.033009, 0, 53.033009))[0], mode=Mode.SUBTRACT)
    add(cut_extrude_1_tool8.solids().sort_by_distance((8, 0, -9.15))[0], mode=Mode.SUBTRACT)
    add(cut_extrude_1_tool9.solids().sort_by_distance((7, 0, -20.15))[0], mode=Mode.SUBTRACT)
    add(cut_extrude_1_tool10.solids().sort_by_distance((0, 0, -27.15))[0], mode=Mode.SUBTRACT)
    add(cut_extrude_1_tool11.solids().sort_by_distance((-36.769553, 0, 36.769553))[0], mode=Mode.SUBTRACT)
    add(cut_extrude_1_tool12.solids().sort_by_distance((-36.769553, 0, -36.769553))[0], mode=Mode.SUBTRACT)
    add(cut_extrude_1_tool13.solids().sort_by_distance((36.769553, 0, -36.769553))[0], mode=Mode.SUBTRACT)
    add(cut_extrude_1_tool14.solids().sort_by_distance((36.769553, 0, 36.769553))[0], mode=Mode.SUBTRACT)
    add(cut_extrude_1_tool15.solids().sort_by_distance((-35, 0, 0))[0], mode=Mode.SUBTRACT)
    add(cut_extrude_1_tool16.solids().sort_by_distance((35, 0, 0))[0], mode=Mode.SUBTRACT)
    add(cut_extrude_1_tool17.solids().sort_by_distance((0, 0, 30))[0], mode=Mode.SUBTRACT)

    # 圆角1
    fillet_1_edges = [part.edges().sort_by_distance(p)[0] for p in [
        (-10, -1.5, 35),
        (-10, -1.5, 25),
        (10, -1.5, 25),
        (10, -1.5, 35),
        (-30, -1.5, -10),
        (-30, -1.5, 10),
        (-40, -1.5, 10),
        (-40, -1.5, -10),
        (40, -1.5, -10),
        (40, -1.5, 10),
        (30, -1.5, 10),
        (30, -1.5, -10),
    ]]
    fillet(fillet_1_edges, radius=FILLET_1_R)


solid = part.part
